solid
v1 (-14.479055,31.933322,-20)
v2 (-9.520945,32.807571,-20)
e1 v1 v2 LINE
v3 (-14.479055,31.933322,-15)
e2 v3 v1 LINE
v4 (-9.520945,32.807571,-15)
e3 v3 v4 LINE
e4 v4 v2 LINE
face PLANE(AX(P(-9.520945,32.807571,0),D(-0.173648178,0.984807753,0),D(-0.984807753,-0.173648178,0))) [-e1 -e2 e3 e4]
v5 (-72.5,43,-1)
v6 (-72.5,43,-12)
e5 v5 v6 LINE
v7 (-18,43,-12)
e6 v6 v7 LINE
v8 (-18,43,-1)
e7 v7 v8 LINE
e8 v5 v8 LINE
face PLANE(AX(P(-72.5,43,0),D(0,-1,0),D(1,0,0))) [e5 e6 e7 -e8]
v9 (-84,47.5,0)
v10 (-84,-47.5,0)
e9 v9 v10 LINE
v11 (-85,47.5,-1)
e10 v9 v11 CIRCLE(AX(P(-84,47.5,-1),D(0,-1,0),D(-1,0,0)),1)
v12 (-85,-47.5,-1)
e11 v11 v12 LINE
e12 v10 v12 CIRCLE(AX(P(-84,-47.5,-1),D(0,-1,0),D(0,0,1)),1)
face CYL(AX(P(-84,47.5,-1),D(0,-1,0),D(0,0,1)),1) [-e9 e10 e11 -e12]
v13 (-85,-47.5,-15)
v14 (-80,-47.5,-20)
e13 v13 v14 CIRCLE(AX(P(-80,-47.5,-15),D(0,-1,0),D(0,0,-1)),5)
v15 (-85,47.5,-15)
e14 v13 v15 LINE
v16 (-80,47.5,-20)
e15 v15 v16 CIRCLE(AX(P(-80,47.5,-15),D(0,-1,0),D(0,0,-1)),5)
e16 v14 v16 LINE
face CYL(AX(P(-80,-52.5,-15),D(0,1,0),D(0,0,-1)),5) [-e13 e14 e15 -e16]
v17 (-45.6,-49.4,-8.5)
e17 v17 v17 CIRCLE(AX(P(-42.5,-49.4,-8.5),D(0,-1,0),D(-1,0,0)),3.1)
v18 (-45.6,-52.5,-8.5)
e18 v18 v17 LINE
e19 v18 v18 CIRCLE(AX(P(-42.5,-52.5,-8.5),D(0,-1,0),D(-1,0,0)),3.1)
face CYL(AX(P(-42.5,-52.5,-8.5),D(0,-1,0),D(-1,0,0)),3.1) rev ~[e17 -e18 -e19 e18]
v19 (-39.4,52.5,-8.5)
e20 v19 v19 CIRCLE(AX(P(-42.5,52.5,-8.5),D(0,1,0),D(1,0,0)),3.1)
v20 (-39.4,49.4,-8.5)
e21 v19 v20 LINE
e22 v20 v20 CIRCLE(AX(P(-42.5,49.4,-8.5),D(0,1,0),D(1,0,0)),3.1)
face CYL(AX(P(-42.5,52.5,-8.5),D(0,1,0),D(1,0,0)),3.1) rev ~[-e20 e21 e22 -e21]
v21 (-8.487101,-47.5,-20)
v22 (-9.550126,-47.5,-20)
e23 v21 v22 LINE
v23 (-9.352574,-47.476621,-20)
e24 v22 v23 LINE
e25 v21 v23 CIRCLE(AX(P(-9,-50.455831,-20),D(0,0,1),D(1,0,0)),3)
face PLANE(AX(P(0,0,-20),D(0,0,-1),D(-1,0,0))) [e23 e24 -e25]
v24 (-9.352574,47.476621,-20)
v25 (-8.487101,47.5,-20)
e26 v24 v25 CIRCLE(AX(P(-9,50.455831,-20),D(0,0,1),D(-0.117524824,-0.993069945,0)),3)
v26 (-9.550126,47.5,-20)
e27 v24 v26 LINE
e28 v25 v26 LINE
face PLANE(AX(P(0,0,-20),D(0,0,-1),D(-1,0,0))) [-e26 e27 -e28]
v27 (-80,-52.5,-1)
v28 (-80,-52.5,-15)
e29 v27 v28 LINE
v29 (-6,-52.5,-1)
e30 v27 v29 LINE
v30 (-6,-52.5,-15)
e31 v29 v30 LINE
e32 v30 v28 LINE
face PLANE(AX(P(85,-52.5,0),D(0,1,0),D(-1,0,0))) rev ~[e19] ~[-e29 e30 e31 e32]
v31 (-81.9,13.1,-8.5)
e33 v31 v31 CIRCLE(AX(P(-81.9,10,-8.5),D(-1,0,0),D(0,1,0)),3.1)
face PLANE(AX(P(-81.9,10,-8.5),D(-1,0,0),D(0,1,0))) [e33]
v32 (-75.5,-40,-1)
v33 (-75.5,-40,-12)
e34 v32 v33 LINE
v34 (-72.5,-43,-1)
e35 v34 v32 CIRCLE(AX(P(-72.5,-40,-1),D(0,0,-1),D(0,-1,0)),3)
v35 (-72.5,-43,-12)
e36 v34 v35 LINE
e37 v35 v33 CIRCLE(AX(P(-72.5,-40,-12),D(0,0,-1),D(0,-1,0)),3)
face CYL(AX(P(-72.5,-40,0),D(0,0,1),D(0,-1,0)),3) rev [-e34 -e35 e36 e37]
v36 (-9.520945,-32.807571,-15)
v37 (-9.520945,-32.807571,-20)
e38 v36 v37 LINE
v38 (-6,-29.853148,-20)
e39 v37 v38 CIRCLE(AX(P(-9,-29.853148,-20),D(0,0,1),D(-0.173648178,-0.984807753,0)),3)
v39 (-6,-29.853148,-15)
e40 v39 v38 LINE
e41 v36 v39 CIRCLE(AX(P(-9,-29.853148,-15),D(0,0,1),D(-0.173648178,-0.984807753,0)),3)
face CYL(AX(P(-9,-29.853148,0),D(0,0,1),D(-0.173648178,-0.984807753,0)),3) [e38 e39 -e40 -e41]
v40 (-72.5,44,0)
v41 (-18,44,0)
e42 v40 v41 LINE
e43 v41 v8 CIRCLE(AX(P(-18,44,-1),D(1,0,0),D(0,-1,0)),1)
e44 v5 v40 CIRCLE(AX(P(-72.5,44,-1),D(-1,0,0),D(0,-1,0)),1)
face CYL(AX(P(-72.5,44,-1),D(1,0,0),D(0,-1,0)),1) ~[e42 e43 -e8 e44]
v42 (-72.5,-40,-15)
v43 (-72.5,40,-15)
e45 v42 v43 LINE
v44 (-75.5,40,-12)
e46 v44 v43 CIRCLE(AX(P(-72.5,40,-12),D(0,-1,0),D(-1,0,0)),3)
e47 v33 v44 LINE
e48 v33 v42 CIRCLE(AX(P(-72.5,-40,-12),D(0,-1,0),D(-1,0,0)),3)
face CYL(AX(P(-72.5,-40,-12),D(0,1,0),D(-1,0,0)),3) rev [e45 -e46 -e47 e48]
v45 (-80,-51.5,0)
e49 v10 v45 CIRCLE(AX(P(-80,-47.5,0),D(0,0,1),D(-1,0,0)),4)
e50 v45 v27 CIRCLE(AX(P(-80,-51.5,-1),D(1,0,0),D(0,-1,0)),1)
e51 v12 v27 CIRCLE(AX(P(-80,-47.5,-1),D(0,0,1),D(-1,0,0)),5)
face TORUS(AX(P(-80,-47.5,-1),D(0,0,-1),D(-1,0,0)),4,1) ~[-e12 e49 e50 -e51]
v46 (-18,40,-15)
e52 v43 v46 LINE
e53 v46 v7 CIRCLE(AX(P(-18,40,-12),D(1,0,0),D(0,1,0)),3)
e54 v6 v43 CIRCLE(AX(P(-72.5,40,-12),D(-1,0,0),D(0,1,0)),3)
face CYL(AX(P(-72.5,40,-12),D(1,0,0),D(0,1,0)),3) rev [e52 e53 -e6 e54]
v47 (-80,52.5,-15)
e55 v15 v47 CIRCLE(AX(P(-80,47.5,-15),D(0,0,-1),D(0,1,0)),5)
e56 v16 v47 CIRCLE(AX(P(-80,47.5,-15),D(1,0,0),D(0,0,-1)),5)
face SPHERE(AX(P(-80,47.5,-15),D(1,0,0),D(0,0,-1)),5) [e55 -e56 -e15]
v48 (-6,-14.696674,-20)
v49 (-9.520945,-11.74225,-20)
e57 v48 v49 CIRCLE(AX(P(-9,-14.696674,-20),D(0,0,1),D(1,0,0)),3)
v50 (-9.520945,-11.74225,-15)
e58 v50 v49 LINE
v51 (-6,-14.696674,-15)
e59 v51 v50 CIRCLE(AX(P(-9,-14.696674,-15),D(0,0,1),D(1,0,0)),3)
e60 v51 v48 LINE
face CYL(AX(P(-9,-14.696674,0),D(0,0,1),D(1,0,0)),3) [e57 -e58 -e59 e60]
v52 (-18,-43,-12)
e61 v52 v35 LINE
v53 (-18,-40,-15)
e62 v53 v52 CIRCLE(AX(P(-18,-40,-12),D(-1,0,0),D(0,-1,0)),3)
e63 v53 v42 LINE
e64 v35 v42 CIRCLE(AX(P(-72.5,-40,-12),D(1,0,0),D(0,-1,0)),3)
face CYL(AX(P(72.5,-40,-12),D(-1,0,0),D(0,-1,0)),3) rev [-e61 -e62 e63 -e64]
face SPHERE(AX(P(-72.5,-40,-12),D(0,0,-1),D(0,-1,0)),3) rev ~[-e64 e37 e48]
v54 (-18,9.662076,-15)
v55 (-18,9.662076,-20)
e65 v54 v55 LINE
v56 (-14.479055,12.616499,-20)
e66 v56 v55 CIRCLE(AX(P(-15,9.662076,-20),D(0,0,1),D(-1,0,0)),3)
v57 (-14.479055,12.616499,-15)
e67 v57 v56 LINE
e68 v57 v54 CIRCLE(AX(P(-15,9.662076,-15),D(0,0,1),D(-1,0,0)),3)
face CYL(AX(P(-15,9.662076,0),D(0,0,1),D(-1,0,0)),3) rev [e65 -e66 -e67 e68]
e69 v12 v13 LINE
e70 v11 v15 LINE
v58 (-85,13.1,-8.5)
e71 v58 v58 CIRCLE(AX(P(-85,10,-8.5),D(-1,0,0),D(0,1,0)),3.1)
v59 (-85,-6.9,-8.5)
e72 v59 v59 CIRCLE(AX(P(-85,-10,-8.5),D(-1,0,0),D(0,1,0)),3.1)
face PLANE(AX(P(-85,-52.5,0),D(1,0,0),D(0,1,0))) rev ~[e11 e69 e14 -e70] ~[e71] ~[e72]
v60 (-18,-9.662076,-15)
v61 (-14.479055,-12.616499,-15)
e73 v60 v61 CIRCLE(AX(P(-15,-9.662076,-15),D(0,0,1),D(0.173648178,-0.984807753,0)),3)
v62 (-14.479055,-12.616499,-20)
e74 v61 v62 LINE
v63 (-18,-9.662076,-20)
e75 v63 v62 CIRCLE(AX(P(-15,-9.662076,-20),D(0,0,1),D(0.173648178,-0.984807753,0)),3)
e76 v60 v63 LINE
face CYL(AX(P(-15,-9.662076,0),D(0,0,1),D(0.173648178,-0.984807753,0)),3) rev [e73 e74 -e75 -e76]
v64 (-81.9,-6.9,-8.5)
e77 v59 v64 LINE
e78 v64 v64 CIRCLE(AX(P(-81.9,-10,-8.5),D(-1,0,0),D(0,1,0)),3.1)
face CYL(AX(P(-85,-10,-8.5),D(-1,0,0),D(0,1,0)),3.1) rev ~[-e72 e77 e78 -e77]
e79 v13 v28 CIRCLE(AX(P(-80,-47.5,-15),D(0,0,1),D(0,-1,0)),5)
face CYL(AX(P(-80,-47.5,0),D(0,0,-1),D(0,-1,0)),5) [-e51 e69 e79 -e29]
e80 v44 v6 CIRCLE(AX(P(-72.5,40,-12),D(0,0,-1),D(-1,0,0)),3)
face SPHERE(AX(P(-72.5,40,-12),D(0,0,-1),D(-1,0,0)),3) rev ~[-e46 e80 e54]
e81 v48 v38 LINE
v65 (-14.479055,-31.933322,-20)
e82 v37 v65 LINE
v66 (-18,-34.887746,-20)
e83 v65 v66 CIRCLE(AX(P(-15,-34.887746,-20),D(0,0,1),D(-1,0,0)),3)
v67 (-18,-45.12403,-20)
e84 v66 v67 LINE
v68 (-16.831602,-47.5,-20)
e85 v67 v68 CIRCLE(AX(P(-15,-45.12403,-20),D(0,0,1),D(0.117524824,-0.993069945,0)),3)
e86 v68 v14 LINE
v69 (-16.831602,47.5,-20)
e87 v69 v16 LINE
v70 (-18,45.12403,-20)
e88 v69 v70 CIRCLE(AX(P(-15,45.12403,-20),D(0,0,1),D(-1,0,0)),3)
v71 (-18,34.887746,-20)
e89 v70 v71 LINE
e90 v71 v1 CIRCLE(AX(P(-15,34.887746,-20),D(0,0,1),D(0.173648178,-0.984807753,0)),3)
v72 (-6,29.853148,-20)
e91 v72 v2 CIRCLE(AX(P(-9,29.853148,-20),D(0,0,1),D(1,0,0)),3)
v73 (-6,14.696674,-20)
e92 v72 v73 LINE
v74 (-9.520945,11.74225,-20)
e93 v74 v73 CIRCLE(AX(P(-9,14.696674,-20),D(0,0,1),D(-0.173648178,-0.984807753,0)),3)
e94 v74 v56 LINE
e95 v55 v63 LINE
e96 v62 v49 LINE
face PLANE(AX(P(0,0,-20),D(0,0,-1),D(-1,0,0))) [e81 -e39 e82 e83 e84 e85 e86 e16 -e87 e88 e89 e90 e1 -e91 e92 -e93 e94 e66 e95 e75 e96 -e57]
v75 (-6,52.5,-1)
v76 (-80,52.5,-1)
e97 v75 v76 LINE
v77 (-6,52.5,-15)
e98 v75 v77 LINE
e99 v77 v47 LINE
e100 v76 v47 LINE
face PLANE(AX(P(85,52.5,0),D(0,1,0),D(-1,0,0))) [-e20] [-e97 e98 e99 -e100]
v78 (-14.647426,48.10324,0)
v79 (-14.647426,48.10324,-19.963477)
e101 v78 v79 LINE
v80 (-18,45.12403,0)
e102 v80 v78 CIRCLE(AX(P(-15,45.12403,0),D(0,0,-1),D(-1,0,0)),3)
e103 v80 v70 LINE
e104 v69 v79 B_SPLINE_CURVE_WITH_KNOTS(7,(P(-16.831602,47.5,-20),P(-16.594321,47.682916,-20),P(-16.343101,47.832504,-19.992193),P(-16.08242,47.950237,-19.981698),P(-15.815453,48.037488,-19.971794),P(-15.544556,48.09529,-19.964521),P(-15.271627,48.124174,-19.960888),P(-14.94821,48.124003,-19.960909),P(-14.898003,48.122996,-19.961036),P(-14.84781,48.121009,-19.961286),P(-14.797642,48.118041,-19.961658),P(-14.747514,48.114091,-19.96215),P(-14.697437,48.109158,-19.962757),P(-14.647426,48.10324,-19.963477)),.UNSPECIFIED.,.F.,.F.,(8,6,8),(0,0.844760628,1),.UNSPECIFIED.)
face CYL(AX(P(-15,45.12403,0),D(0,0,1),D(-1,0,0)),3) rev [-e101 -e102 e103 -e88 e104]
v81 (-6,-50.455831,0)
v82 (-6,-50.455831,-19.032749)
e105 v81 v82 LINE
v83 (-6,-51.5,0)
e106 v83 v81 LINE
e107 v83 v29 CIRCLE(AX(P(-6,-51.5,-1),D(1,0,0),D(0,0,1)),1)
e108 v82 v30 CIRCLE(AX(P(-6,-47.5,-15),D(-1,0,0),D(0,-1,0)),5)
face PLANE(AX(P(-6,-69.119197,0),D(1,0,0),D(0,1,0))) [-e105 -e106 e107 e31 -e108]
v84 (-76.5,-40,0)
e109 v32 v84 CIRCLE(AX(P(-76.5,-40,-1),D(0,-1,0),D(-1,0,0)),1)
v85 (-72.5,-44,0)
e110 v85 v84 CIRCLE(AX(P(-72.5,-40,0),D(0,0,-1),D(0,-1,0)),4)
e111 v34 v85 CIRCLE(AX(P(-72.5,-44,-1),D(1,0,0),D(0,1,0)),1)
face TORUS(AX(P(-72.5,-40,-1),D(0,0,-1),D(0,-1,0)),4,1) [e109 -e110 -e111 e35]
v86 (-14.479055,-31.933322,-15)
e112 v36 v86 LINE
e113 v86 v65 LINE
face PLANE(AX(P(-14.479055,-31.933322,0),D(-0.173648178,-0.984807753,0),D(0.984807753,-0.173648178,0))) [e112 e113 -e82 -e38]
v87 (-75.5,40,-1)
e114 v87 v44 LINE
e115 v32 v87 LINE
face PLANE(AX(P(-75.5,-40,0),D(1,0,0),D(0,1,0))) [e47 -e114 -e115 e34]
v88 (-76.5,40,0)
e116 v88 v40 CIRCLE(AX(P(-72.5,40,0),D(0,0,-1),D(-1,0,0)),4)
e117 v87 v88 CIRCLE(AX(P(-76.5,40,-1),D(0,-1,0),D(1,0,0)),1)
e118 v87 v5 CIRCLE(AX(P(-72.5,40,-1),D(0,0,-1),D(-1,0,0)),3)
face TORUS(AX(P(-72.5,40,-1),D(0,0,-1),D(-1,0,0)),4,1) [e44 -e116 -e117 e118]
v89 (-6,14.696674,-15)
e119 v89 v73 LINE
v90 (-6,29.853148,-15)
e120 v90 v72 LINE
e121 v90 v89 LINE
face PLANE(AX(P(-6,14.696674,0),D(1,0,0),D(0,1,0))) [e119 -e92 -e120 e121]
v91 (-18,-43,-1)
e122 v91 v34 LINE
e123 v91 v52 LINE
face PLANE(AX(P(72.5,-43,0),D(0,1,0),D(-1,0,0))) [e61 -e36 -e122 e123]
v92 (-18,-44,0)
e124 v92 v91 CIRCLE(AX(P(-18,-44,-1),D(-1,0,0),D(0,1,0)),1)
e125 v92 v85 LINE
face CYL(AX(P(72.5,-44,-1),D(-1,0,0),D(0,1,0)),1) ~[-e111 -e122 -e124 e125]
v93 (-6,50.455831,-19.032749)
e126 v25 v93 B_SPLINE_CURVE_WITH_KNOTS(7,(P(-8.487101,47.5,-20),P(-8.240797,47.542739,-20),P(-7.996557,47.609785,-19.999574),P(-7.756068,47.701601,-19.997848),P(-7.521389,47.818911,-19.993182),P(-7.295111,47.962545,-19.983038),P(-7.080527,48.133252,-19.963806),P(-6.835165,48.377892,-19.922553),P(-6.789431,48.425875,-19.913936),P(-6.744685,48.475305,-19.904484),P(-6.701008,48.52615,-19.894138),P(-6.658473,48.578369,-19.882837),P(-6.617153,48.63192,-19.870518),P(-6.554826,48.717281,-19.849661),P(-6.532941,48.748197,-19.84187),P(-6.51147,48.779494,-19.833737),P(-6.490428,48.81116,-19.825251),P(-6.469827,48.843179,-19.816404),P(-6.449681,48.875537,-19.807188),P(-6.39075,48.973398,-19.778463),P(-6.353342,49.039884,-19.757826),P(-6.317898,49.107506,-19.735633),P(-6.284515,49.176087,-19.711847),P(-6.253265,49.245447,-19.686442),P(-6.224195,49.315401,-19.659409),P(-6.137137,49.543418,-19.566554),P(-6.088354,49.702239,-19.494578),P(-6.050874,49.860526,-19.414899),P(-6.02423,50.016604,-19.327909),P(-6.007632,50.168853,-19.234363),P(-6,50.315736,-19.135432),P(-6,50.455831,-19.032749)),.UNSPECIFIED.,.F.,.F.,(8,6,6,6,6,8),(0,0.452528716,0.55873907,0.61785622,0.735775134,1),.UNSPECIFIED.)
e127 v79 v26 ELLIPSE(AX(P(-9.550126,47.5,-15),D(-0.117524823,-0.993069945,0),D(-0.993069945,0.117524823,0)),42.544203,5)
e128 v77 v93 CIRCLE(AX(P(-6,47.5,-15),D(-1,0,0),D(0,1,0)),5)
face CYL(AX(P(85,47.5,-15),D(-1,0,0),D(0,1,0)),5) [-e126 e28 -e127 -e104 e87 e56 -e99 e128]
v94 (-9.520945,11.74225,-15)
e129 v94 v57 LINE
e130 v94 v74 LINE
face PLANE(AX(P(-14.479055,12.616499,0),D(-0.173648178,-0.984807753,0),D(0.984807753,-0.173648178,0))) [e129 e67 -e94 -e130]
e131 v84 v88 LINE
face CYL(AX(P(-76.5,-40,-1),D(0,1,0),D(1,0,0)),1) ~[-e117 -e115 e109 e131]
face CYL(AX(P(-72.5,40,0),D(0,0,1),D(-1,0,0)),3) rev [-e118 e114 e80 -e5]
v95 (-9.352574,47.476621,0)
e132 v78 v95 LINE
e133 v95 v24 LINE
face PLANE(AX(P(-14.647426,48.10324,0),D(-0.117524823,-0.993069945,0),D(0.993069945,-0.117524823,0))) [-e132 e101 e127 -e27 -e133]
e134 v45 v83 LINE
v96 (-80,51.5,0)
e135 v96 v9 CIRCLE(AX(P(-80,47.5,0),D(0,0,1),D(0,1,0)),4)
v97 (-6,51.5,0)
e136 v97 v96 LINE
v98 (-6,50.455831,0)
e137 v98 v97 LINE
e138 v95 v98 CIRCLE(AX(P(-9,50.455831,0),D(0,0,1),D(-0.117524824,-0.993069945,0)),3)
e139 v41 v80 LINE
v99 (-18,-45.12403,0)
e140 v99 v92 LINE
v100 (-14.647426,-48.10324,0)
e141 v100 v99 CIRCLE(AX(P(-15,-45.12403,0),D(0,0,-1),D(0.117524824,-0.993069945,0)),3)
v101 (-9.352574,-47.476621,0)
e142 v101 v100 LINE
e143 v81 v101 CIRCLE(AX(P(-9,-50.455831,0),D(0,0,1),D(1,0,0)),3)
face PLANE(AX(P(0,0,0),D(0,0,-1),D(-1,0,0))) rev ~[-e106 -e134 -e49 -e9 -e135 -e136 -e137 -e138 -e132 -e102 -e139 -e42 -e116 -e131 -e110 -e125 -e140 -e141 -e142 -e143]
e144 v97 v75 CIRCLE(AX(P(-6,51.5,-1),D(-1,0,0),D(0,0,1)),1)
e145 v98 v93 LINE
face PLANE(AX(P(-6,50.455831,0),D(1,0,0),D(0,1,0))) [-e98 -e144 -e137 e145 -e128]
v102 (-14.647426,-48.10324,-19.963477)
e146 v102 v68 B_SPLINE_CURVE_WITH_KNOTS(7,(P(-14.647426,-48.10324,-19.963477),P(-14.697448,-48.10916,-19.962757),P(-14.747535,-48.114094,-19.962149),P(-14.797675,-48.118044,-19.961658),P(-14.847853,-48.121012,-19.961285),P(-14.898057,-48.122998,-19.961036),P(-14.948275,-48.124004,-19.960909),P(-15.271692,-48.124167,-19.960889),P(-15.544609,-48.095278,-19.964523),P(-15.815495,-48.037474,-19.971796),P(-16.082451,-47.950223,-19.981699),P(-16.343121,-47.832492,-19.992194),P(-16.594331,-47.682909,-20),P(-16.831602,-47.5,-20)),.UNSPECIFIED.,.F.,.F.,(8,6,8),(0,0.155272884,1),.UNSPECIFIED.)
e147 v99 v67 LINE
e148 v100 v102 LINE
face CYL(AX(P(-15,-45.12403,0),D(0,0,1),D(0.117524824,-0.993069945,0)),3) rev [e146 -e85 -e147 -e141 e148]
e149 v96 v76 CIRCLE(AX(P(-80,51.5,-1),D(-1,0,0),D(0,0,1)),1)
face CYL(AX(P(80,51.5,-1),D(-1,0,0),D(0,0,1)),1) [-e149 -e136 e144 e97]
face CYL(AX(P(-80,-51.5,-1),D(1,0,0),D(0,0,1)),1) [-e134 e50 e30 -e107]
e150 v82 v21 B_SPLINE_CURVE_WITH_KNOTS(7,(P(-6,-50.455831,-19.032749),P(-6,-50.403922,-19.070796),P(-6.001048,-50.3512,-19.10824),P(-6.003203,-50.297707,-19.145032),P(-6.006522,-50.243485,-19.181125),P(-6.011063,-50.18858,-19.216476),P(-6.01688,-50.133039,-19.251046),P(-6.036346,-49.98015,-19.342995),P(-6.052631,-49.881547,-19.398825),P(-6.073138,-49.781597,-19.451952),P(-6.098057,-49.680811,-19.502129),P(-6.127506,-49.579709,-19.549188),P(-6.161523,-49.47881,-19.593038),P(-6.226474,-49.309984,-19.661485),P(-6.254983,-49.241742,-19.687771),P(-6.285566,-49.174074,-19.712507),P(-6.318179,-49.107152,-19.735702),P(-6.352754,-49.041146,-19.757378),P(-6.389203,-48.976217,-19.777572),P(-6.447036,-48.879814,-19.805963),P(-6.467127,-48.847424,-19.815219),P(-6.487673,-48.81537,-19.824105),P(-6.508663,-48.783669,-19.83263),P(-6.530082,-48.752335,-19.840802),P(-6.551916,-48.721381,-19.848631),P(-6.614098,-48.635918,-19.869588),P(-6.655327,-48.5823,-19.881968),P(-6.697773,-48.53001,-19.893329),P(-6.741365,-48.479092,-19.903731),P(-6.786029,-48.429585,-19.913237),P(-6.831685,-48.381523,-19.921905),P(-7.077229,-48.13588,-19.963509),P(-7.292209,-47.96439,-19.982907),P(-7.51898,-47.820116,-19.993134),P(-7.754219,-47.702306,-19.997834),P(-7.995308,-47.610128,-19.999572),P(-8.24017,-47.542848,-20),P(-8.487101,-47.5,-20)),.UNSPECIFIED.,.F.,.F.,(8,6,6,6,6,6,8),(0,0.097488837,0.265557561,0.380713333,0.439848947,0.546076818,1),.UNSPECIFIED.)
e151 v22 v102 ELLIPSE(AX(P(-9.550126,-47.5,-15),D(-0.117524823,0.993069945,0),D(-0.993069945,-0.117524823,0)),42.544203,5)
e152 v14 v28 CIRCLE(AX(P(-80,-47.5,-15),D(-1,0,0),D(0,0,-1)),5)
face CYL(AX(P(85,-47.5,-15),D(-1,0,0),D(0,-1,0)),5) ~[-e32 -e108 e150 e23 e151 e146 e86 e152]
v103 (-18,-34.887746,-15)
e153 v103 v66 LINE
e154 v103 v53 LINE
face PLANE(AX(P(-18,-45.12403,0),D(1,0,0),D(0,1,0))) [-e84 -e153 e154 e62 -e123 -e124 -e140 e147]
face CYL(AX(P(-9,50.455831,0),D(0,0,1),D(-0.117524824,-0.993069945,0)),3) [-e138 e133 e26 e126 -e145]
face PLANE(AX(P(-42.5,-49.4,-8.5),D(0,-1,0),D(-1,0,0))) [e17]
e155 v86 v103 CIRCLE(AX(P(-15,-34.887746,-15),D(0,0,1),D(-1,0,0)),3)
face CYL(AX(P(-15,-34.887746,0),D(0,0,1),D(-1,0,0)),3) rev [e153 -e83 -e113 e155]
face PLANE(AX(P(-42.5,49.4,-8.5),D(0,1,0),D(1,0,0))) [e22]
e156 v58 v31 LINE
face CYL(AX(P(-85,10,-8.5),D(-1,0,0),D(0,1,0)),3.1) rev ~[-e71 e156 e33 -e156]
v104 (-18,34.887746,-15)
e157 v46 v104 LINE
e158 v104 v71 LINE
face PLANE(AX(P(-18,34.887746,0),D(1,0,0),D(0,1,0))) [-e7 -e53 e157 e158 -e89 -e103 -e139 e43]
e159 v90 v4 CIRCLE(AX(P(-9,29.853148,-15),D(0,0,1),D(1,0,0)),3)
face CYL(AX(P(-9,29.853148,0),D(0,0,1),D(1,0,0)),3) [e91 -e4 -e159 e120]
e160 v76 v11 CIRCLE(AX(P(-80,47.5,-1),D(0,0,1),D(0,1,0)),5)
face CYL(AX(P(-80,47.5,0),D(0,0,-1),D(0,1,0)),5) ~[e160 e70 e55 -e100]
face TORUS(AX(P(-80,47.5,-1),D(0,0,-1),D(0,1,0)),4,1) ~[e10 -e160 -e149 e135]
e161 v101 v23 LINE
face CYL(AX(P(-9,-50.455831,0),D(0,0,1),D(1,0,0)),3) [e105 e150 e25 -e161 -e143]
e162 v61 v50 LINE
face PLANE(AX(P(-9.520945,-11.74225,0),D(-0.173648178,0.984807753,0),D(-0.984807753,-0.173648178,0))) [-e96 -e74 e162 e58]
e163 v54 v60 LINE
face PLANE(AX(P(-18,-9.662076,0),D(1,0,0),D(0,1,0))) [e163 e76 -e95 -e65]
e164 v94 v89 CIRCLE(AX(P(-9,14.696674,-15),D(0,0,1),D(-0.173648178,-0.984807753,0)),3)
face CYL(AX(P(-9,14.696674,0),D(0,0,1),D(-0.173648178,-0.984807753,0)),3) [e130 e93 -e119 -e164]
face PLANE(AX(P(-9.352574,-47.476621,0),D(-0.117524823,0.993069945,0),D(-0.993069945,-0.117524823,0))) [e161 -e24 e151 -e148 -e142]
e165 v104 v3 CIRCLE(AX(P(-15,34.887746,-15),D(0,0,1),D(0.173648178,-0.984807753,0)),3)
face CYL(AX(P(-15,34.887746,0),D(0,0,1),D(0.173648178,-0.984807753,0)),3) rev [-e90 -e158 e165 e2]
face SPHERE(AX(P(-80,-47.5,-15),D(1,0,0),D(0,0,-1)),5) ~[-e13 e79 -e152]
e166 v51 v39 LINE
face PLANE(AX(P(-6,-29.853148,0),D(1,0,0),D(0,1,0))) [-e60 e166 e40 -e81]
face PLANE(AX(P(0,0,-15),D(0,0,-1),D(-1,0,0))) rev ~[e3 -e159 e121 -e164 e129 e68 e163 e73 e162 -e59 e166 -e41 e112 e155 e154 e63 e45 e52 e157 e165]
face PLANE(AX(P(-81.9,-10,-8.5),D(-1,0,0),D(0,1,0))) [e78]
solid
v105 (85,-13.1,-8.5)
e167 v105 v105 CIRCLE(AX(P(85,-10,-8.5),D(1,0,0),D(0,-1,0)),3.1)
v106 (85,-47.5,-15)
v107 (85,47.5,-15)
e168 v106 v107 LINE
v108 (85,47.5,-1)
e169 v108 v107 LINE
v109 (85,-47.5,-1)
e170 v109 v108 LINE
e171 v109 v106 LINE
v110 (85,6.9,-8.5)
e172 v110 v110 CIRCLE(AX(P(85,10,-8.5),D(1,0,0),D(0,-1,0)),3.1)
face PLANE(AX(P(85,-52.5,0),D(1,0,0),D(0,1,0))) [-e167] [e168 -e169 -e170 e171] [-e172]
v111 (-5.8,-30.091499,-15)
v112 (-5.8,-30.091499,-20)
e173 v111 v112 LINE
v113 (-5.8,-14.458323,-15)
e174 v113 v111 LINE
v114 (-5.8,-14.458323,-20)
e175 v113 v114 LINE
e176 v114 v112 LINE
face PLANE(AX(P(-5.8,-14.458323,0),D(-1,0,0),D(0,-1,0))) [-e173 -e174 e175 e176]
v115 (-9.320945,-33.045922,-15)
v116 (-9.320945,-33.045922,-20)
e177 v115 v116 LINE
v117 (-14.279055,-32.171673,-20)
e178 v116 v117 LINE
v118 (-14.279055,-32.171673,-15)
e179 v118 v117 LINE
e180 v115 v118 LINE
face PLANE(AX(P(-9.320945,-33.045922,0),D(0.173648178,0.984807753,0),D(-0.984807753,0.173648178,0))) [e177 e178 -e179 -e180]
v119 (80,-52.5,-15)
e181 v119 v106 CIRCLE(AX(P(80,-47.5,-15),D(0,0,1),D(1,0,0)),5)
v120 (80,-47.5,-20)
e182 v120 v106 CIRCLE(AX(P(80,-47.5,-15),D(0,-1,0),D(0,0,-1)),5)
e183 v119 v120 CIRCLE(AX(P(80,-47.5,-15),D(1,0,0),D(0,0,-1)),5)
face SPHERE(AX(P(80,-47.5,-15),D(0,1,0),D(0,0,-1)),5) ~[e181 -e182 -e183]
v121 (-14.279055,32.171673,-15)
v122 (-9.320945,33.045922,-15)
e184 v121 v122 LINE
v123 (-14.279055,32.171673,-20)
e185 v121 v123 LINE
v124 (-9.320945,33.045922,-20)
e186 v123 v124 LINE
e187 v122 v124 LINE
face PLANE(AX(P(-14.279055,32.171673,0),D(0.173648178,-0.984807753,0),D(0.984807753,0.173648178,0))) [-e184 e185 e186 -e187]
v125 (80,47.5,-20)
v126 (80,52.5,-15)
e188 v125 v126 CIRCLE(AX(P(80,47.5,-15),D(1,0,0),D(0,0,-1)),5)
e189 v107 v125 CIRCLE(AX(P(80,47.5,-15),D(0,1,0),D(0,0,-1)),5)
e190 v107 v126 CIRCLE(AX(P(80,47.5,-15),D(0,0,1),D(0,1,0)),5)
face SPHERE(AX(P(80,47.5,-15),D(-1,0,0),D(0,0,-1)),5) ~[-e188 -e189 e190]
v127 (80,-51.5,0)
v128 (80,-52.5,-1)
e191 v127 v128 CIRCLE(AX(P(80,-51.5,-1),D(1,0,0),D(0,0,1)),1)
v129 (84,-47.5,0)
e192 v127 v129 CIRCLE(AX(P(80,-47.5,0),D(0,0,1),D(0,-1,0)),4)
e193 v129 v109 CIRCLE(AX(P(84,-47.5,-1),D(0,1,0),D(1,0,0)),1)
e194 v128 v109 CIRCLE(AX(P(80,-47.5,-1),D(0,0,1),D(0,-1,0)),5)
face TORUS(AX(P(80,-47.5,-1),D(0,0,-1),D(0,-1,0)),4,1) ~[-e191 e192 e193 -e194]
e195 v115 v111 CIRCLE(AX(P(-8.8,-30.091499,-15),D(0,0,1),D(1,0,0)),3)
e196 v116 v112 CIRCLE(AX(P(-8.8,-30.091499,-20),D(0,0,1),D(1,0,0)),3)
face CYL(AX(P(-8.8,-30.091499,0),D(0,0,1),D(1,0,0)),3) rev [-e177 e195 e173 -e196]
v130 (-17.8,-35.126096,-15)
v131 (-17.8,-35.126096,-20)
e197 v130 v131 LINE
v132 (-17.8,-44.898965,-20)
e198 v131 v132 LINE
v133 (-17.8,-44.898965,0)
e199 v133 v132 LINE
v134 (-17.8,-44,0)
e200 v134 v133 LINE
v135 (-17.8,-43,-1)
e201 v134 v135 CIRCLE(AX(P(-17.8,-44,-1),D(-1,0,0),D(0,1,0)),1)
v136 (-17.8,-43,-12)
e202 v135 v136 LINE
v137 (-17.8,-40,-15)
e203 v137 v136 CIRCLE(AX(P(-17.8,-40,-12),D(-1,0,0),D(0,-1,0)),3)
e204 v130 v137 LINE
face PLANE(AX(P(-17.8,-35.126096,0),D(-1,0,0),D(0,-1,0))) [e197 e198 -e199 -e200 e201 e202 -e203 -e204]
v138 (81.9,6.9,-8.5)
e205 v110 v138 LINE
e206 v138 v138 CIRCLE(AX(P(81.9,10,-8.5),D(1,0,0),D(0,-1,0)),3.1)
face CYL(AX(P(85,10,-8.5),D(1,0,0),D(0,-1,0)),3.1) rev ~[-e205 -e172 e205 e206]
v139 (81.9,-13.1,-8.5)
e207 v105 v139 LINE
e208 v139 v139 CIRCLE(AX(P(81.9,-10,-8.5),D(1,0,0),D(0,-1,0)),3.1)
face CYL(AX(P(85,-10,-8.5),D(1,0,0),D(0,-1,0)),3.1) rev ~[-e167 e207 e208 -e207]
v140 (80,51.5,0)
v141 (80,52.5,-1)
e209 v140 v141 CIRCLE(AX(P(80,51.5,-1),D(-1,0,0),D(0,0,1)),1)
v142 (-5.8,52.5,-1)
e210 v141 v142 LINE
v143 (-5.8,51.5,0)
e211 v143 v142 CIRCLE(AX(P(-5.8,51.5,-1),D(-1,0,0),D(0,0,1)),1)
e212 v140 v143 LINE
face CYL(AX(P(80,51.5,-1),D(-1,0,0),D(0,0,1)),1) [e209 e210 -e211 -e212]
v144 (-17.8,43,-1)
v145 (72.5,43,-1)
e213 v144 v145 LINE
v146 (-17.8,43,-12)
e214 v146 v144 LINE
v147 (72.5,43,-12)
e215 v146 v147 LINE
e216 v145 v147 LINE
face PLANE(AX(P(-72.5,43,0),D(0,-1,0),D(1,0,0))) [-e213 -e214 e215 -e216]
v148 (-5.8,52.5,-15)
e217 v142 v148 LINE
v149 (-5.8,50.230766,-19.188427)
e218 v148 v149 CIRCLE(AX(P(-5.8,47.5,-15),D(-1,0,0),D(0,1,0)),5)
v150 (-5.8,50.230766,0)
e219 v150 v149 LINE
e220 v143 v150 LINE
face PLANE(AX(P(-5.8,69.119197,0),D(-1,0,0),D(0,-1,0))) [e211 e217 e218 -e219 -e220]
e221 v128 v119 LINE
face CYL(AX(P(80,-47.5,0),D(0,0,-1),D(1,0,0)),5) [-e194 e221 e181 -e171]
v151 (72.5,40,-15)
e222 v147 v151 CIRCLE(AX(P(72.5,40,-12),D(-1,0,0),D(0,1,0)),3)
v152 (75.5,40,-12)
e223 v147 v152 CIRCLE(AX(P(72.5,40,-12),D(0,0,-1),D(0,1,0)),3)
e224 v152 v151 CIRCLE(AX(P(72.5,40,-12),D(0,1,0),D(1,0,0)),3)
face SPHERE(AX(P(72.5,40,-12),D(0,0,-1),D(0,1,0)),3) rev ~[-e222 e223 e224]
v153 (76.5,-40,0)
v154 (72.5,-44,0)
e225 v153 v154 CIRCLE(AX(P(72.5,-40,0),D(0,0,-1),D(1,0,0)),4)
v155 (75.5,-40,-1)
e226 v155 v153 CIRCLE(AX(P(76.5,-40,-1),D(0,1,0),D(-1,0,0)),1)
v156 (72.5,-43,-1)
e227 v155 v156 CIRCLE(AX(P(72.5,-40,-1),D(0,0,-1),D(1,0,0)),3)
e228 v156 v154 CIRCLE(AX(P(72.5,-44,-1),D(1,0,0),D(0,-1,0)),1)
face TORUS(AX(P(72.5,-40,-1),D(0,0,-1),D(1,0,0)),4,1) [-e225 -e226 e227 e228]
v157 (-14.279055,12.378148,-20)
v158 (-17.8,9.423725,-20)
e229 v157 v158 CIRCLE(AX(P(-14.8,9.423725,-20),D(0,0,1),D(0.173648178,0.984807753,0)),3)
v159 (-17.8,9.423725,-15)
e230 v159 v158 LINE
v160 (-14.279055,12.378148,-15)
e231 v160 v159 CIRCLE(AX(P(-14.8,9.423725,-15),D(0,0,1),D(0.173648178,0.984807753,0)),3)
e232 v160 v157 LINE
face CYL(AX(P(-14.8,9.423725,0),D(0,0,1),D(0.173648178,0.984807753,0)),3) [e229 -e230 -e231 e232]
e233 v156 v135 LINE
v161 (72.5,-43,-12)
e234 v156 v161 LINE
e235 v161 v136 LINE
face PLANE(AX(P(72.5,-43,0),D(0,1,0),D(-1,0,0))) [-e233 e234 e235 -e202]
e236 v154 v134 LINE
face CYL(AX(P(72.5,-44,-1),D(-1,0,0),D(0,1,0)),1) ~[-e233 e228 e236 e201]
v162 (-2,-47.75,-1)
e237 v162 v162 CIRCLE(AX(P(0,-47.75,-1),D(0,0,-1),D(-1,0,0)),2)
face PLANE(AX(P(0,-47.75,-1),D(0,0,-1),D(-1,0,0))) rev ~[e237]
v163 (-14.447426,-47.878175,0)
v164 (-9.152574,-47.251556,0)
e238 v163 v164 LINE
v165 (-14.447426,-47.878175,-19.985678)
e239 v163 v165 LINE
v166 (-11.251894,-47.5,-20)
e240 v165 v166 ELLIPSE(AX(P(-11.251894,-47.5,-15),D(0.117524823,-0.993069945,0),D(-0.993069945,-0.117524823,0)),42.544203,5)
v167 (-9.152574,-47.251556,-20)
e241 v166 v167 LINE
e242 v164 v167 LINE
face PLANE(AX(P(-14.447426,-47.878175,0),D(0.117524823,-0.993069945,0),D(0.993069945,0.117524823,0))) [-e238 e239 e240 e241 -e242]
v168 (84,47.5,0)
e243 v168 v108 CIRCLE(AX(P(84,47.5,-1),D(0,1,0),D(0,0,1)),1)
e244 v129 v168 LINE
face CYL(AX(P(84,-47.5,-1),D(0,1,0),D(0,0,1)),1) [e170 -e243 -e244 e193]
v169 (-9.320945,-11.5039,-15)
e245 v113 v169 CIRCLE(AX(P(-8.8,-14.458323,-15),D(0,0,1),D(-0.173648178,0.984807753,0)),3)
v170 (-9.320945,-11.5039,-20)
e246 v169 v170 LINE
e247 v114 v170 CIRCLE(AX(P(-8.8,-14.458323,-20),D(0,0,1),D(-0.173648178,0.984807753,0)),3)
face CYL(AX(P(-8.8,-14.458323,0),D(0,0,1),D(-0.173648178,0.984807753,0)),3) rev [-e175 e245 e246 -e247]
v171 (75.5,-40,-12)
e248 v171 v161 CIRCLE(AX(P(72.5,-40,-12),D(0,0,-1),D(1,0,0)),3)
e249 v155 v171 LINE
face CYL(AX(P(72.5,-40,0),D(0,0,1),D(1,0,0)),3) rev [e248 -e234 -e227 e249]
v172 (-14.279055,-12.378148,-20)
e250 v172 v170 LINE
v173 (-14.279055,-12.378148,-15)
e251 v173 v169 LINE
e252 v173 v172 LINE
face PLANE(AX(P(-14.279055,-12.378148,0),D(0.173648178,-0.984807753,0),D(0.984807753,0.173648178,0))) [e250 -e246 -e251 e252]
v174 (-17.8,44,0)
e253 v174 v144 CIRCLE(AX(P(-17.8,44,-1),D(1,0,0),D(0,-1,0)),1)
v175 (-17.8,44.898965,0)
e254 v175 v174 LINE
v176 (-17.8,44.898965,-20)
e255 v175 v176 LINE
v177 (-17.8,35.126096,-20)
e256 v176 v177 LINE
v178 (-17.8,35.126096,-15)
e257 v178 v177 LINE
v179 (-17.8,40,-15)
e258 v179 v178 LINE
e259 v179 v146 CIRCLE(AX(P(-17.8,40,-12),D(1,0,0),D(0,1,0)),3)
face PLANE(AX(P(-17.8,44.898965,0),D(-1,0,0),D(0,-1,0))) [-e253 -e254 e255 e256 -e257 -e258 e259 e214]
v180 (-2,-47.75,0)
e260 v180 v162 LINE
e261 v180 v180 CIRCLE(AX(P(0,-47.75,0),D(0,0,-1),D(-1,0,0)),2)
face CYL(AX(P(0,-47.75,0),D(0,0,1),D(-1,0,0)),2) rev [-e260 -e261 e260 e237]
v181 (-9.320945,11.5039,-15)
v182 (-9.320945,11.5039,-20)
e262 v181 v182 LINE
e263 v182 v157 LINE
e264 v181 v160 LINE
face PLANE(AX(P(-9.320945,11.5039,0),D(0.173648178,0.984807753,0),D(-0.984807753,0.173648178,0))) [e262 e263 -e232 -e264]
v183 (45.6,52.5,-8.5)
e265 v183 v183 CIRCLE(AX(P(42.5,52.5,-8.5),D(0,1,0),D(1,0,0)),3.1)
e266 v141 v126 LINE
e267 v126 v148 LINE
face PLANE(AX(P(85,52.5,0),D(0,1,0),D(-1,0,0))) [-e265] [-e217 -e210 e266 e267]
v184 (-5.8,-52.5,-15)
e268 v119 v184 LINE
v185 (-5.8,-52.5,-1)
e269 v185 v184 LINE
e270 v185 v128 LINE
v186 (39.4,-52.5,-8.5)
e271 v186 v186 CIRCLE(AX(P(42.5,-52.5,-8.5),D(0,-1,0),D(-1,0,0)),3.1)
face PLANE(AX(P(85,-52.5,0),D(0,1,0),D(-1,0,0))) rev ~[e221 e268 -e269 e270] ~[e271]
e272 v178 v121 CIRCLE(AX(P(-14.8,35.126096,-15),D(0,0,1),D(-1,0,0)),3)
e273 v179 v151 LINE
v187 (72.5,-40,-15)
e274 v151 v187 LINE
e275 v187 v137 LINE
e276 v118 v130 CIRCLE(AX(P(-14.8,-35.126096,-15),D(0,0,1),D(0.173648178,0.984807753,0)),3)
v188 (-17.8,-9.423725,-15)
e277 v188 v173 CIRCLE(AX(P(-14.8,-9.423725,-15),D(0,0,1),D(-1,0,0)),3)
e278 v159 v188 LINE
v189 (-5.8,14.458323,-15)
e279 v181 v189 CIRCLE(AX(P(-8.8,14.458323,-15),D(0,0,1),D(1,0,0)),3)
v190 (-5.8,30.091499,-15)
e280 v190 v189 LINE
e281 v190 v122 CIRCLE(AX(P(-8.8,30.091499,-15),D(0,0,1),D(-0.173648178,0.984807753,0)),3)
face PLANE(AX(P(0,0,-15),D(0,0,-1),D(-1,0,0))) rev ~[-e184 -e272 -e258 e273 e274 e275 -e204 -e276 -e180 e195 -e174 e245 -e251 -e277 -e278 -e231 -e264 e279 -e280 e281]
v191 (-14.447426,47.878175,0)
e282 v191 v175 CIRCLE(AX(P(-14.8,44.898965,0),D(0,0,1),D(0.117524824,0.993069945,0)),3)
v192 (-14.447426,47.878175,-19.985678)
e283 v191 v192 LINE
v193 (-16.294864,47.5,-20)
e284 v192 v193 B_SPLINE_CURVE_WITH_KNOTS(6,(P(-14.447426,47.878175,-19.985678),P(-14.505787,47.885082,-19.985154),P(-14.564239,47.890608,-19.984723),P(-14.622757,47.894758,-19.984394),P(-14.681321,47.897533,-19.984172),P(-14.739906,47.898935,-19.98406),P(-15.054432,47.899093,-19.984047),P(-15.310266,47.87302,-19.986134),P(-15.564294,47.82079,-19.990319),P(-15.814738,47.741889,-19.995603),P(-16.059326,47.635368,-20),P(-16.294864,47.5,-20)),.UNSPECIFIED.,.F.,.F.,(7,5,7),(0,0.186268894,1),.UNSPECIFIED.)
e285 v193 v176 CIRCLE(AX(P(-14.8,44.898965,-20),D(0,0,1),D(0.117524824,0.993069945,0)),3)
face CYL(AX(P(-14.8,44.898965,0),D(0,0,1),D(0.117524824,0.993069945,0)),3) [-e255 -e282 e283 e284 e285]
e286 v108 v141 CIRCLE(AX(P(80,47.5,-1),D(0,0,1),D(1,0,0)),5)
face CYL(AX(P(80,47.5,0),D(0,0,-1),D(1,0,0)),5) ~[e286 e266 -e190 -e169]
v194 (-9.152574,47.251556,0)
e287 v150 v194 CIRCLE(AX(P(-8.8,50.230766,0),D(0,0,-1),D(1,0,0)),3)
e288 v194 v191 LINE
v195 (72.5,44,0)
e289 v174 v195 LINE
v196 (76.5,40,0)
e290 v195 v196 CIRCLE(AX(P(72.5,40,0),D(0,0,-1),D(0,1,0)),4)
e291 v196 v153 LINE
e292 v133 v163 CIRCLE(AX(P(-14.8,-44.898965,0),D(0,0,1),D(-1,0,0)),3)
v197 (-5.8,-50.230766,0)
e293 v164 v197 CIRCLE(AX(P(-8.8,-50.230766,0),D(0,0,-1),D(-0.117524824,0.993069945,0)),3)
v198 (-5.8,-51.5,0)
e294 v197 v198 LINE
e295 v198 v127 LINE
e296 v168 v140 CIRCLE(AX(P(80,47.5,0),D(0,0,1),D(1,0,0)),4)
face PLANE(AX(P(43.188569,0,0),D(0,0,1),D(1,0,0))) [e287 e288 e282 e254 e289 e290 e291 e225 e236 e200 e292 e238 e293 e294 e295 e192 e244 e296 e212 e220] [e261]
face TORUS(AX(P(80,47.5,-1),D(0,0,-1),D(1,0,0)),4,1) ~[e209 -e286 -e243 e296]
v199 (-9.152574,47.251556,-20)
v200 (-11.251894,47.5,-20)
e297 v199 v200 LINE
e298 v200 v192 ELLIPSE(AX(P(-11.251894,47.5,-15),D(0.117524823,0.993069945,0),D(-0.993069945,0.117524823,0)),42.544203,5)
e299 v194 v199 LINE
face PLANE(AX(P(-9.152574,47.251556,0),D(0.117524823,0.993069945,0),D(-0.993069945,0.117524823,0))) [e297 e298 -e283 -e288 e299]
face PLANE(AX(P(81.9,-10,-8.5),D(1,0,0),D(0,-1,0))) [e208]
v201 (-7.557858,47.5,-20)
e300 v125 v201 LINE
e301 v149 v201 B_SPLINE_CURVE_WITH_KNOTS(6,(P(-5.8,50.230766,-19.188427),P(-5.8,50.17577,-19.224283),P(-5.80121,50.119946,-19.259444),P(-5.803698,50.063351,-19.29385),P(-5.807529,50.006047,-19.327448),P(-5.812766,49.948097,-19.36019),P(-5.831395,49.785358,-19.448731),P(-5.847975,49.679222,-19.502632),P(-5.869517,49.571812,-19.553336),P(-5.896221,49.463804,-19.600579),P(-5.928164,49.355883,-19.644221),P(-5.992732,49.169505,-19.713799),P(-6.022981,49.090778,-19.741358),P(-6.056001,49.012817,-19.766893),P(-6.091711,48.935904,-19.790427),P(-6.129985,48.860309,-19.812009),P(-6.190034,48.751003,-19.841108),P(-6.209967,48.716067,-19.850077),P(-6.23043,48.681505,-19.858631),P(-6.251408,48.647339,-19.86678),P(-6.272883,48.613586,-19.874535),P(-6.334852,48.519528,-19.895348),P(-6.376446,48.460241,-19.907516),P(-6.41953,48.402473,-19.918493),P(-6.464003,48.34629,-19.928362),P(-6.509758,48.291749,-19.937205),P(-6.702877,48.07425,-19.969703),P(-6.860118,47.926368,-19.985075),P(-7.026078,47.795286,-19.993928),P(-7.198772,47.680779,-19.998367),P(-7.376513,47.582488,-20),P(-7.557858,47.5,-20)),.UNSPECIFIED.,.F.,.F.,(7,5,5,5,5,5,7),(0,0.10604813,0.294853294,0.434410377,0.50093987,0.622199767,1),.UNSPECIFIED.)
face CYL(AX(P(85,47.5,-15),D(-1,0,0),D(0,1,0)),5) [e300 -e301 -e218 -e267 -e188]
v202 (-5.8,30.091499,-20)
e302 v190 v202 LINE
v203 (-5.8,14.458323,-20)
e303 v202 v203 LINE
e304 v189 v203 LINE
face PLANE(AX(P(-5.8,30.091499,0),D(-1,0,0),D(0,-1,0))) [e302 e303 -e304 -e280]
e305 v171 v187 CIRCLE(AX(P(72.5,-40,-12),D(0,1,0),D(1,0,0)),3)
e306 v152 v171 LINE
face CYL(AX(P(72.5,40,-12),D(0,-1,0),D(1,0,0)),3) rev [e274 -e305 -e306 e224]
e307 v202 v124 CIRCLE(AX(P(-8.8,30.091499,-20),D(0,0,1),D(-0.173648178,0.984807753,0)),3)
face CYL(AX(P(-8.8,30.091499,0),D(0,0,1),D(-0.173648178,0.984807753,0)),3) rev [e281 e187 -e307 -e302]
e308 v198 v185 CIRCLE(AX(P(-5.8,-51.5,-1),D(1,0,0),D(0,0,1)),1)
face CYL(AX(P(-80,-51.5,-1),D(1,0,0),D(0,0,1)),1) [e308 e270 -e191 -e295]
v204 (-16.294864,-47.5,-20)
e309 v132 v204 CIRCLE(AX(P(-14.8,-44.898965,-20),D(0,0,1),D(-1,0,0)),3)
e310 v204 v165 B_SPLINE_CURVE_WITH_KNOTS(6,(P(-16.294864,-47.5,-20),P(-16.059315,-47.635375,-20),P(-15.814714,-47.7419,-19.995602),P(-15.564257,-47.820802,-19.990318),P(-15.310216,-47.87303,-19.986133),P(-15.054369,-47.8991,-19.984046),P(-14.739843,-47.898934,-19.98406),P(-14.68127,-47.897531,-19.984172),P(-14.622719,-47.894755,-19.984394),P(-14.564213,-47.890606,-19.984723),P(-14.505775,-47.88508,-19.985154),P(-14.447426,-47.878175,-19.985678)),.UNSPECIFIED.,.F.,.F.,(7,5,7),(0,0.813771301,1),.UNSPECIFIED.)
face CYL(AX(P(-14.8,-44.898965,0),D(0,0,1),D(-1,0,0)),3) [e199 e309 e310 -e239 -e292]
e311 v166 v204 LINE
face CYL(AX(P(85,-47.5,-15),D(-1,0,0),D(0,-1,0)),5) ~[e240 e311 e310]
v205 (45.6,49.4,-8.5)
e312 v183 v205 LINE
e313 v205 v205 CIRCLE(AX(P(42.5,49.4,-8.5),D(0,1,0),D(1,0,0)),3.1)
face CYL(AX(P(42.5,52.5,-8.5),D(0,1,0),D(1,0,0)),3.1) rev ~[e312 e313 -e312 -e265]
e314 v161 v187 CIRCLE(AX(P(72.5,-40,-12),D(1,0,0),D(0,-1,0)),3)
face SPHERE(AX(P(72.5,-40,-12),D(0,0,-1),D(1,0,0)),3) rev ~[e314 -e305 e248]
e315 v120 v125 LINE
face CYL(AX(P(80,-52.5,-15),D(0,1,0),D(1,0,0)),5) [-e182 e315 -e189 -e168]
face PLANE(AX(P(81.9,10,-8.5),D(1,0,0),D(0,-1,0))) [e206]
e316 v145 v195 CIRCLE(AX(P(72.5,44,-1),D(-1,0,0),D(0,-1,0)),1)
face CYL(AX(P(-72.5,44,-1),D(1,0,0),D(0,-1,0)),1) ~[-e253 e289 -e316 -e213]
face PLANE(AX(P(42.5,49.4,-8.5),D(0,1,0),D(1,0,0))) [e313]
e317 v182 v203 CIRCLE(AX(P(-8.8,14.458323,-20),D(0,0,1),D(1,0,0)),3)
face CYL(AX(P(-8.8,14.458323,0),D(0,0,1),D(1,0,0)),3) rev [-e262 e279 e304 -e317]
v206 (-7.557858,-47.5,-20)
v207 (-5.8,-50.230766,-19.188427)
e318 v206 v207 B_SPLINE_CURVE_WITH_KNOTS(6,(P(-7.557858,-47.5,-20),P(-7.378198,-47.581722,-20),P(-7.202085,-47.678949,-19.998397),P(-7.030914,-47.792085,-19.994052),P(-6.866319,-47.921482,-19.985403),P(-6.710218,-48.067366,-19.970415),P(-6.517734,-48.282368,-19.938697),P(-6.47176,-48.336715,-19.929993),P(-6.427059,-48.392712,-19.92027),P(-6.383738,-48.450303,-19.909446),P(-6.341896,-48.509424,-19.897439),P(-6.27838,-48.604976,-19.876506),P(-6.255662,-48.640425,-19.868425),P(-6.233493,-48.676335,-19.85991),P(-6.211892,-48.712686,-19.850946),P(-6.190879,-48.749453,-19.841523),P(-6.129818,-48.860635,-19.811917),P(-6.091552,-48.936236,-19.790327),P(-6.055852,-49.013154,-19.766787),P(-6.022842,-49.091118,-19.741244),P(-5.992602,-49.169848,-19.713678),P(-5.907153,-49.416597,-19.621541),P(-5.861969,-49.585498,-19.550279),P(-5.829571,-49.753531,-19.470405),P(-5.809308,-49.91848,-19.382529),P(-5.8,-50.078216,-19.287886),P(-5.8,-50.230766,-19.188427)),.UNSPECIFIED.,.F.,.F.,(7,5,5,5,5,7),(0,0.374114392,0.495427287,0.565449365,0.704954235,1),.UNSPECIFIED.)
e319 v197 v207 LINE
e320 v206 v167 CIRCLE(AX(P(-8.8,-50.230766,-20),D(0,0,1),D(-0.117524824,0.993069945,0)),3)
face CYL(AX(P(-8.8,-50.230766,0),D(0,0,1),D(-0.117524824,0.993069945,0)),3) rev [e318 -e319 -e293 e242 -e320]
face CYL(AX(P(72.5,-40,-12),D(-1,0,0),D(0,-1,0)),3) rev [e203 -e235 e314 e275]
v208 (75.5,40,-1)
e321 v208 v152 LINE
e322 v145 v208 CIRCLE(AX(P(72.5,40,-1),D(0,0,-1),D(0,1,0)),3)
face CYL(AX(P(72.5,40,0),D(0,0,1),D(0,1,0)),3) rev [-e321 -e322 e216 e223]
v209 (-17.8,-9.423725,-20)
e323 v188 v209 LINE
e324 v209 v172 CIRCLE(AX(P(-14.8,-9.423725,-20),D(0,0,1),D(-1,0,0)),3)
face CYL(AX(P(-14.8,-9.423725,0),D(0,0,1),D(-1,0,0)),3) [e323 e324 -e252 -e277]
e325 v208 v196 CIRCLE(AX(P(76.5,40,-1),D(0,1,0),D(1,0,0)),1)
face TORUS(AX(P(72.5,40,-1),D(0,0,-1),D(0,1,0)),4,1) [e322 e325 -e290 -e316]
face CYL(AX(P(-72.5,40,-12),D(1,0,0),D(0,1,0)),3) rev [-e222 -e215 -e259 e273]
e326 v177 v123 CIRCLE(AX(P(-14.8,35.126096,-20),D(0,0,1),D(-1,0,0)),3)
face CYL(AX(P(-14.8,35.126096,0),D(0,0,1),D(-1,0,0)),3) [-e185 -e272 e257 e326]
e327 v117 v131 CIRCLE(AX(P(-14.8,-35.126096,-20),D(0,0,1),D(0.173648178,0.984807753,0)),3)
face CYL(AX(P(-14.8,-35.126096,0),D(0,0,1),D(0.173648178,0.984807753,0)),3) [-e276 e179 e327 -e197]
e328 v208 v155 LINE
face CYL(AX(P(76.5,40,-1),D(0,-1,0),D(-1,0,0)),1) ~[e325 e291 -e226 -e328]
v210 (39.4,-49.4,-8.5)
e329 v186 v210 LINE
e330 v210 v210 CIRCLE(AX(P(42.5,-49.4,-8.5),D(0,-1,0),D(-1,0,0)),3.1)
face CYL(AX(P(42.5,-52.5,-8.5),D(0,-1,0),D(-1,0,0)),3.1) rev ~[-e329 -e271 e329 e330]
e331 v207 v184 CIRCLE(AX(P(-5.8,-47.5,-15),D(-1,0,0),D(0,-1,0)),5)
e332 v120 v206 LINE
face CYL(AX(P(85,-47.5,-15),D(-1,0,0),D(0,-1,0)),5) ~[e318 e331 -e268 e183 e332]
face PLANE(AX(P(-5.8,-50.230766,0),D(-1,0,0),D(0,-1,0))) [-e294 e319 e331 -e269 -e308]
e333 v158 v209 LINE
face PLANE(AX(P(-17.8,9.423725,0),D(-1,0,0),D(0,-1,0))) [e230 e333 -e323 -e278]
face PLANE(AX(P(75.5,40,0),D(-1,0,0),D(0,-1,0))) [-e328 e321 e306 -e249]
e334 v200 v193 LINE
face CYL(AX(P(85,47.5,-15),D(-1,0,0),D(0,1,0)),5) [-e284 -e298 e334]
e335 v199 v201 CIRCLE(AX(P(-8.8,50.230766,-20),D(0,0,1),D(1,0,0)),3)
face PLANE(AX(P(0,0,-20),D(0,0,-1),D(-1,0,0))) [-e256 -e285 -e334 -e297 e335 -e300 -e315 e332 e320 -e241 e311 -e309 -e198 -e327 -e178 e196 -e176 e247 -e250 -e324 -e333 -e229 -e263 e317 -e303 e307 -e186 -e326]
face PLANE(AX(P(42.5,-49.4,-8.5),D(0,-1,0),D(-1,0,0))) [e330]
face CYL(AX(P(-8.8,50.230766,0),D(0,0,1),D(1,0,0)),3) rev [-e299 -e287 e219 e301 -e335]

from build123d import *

# Parameters (mm, degrees)
F0_W      = 170
F0_H      = 105
F0_R      = 2
F3_DEPTH  = 20
F4_DEPTH  = 15
F5_R      = 5
F6_R      = 3
F7_R      = 1
F8_R      = 3.1
F9_DEPTH  = 3.1
F10_R     = 3.1
F11_DEPTH = 3.1
F12_R     = 3.1
F13_DEPTH = 3.1
F14_R     = 3.1
F15_DEPTH = 3.1
F16_DEPTH = 1
F17_ANGLE = 180
F19_DEPTH = 25
F20_DEPTH = 25


# Not quite as in the source:
# - a feature names something its author has since deleted; it is built from what else it names


with BuildPart() as f3:
    # F0 (on Top) → F3 (new body)
    with BuildSketch(Plane.XY):
        Rectangle(F0_W, F0_H)
        with Locations((0, -47.75)):
            Circle(F0_R, mode=Mode.SUBTRACT)
        with BuildLine():
            ThreePointArc((-75.5, 40), (-74.6213203436, 42.1213203436), (-72.5, 43))
            Line((-72.5, 43), (72.5, 43))
            ThreePointArc((72.5, 43), (74.6213203436, 42.1213203436), (75.5, 40))
            Line((75.5, 40), (75.5, -40))
            ThreePointArc((75.5, -40), (74.6213203436, -42.1213203436), (72.5, -43))
            Line((72.5, -43), (-72.5, -43))
            ThreePointArc((-72.5, -43), (-74.6213203436, -42.1213203436), (-75.5, -40))
            Line((-75.5, -40), (-75.5, 40))
        make_face(mode=Mode.SUBTRACT)
        with BuildLine():
            Line((72.5, 43), (-72.5, 43))
            ThreePointArc((-72.5, 43), (-74.6213203436, 42.1213203436), (-75.5, 40))
            Line((-75.5, 40), (-75.5, -40))
            ThreePointArc((-75.5, -40), (-74.6213203436, -42.1213203436), (-72.5, -43))
            Line((-72.5, -43), (72.5, -43))
            ThreePointArc((72.5, -43), (74.6213203436, -42.1213203436), (75.5, -40))
            Line((75.5, -40), (75.5, 40))
            ThreePointArc((75.5, 40), (74.6213203436, 42.1213203436), (72.5, 43))
        make_face()
        with Locations((0, -47.75)):
            Circle(F0_R)
    extrude(amount=F3_DEPTH)

    # F0 (on Top) → F4 (cut)
    with BuildSketch(Plane.XY):
        with BuildLine():
            Line((72.5, 43), (-72.5, 43))
            ThreePointArc((-72.5, 43), (-74.6213203436, 42.1213203436), (-75.5, 40))
            Line((-75.5, 40), (-75.5, -40))
            ThreePointArc((-75.5, -40), (-74.6213203436, -42.1213203436), (-72.5, -43))
            Line((-72.5, -43), (72.5, -43))
            ThreePointArc((72.5, -43), (74.6213203436, -42.1213203436), (75.5, -40))
            Line((75.5, -40), (75.5, 40))
            ThreePointArc((75.5, 40), (74.6213203436, 42.1213203436), (72.5, 43))
        make_face()
    extrude(amount=F4_DEPTH, mode=Mode.SUBTRACT)

    # F5
    f5_edges = [f3.edges().sort_by_distance(p)[0] for p in [
        (0, 52.5, 20),
        (-85, 0, 20),
        (0, -52.5, 20),
        (85, 0, 20),
        (85, 52.5, 10),
        (-85, 52.5, 10),
        (-85, -52.5, 10),
        (85, -52.5, 10),
    ]]
    fillet(f5_edges, radius=F5_R)

    # F6
    f6_edges = [f3.edges().sort_by_distance(p)[0] for p in [
        (0, 43, 15),
        (-74.62132, 42.12132, 15),
        (-75.5, 0, 15),
        (-74.62132, -42.12132, 15),
        (0, -43, 15),
        (74.62132, -42.12132, 15),
        (75.5, 0, 15),
        (74.62132, 42.12132, 15),
    ]]
    fillet(f6_edges, radius=F6_R)

    # F7
    f7_edges = [f3.edges().sort_by_distance(p)[0] for p in [
        (0, 52.5, 0),
        (83.535534, 51.035534, 0),
        (-83.535534, 51.035534, 0),
        (85, 0, 0),
        (-85, 0, 0),
        (83.535534, -51.035534, 0),
        (-83.535534, -51.035534, 0),
        (0, -52.5, 0),
        (0, 43, 0),
        (-74.62132, 42.12132, 0),
        (-75.5, 0, 0),
        (-74.62132, -42.12132, 0),
        (0, -43, 0),
        (74.62132, -42.12132, 0),
        (75.5, 0, 0),
        (74.62132, 42.12132, 0),
    ]]
    fillet(f7_edges, radius=F7_R)

    # F8 (on face) → F9 (cut)
    with BuildSketch(Plane.XZ.offset(52.5)):
        with Locations((42.5, 8.5)):
            Circle(F8_R)
        with Locations((-42.5, 8.5)):
            Circle(F8_R)
    extrude(amount=-F9_DEPTH, mode=Mode.SUBTRACT)

    # F10 (on face) → F11 (cut)
    with BuildSketch(Plane(origin=(0, 52.5, 0), x_dir=(-1, 0, 0), z_dir=(0, 1, 0))):
        with Locations((42.5, 8.5)):
            Circle(F10_R)
        with Locations((-42.5, 8.5)):
            Circle(F10_R)
    extrude(amount=-F11_DEPTH, mode=Mode.SUBTRACT)

    # F12 (on face) → F13 (cut)
    with BuildSketch(Plane(origin=(-85, 0, 0), x_dir=(0, -1, 0), z_dir=(-1, 0, 0))):
        with Locations((10, 8.5)):
            Circle(F12_R)
        with Locations((-10, 8.5)):
            Circle(F12_R)
    extrude(amount=-F13_DEPTH, mode=Mode.SUBTRACT)

    # F14 (on face) → F15 (cut)
    with BuildSketch(Plane.YZ.offset(85)):
        with Locations((10, 8.5)):
            Circle(F14_R)
        with Locations((-10, 8.5)):
            Circle(F14_R)
    extrude(amount=-F15_DEPTH, mode=Mode.SUBTRACT)

    # F0 (on Top) → F16 (cut)
    with BuildSketch(Plane.XY):
        with Locations((0, -47.75)):
            Circle(F0_R)
    extrude(amount=F16_DEPTH, mode=Mode.SUBTRACT)


with BuildPart() as f3_1:
    # F17: moved
    add(f3.part.rotate(Axis((0, 0, 0), (0, 1, 0)), F17_ANGLE))


with BuildPart() as f19:
    # F18 (on Top) → F19 (new body)
    with BuildSketch(Plane.XY):
        with BuildLine():
            Line((-18, -9.6620759565), (-18, 0))
            Line((-18, 0), (-18, 9.6620759565))
            ThreePointArc((-18, 9.6620759565), (-16.9283628291, 11.9602092859), (-14.479055467, 12.6164992155))
            Line((-14.479055467, 12.6164992155), (-9.520944533, 11.7422504845))
            ThreePointArc((-9.520944533, 11.7422504845), (-7.0716371709, 12.3985404142), (-6, 14.6966737436))
            Line((-6, 14.6966737436), (-6, 29.8531478456))
            ThreePointArc((-6, 29.8531478456), (-7.0716371709, 32.151281175), (-9.520944533, 32.8075711047))
            Line((-9.520944533, 32.8075711047), (-14.479055467, 31.9333223736))
            ThreePointArc((-14.479055467, 31.9333223736), (-16.9283628291, 32.5896123033), (-18, 34.8877456327))
            Line((-18, 34.8877456327), (-18, 45.1240298712))
            ThreePointArc((-18, 45.1240298712), (-16.9927715108, 47.3665422359), (-14.6474255295, 48.1032397065))
            Line((-14.6474255295, 48.1032397065), (-9.3525744705, 47.4766207667))
            ThreePointArc((-9.3525744705, 47.4766207667), (-7.0072284892, 48.2133182373), (-6, 50.455830602))
            Line((-6, 50.455830602), (-6, 69.1191965569))
            Line((-6, 69.1191965569), (-107.2437387941, 69.1191965569))
            Line((-107.2437387941, 69.1191965569), (-107.2437387941, 0))
            Line((-107.2437387941, 0), (-107.2437387941, -69.1191965569))
            Line((-107.2437387941, -69.1191965569), (-6, -69.1191965569))
            Line((-6, -69.1191965569), (-6, -50.455830602))
            ThreePointArc((-6, -50.455830602), (-7.0072284892, -48.2133182373), (-9.3525744705, -47.4766207667))
            Line((-9.3525744705, -47.4766207667), (-14.6474255295, -48.1032397065))
            ThreePointArc((-14.6474255295, -48.1032397065), (-16.9927715108, -47.3665422359), (-18, -45.1240298712))
            Line((-18, -45.1240298712), (-18, -34.8877456327))
            ThreePointArc((-18, -34.8877456327), (-16.9283628291, -32.5896123033), (-14.479055467, -31.9333223736))
            Line((-14.479055467, -31.9333223736), (-9.520944533, -32.8075711047))
            ThreePointArc((-9.520944533, -32.8075711047), (-7.0716371709, -32.151281175), (-6, -29.8531478456))
            Line((-6, -29.8531478456), (-6, -14.6966737436))
            ThreePointArc((-6, -14.6966737436), (-7.0716371709, -12.3985404142), (-9.520944533, -11.7422504845))
            Line((-9.520944533, -11.7422504845), (-14.479055467, -12.6164992155))
            ThreePointArc((-14.479055467, -12.6164992155), (-16.9283628291, -11.9602092859), (-18, -9.6620759565))
        make_face()
    extrude(amount=-F19_DEPTH)


with BuildPart() as f20:
    # F18 (on Top) → F20 (new body)
    with BuildSketch(Plane.XY):
        with BuildLine():
            Line((108.1050901483, 69.1191965569), (-5.8, 69.1191965569))
            Line((-5.8, 69.1191965569), (-5.8, 50.2307659268))
            ThreePointArc((-5.8, 50.2307659268), (-6.8072284892, 47.9882535621), (-9.1525744705, 47.2515560915))
            Line((-9.1525744705, 47.2515560915), (-14.4474255295, 47.8781750312))
            ThreePointArc((-14.4474255295, 47.8781750312), (-16.7927715108, 47.1414775606), (-17.8, 44.8989651959))
            Line((-17.8, 44.8989651959), (-17.8, 35.1260963512))
            ThreePointArc((-17.8, 35.1260963512), (-16.7283628291, 32.8279630218), (-14.279055467, 32.1716730922))
            Line((-14.279055467, 32.1716730922), (-9.320944533, 33.0459218232))
            ThreePointArc((-9.320944533, 33.0459218232), (-6.8716371709, 32.3896318935), (-5.8, 30.0914985641))
            Line((-5.8, 30.0914985641), (-5.8, 14.4583230251))
            ThreePointArc((-5.8, 14.4583230251), (-6.8716371709, 12.1601896957), (-9.320944533, 11.503899766))
            Line((-9.320944533, 11.503899766), (-14.279055467, 12.378148497))
            ThreePointArc((-14.279055467, 12.378148497), (-16.7283628291, 11.7218585673), (-17.8, 9.423725238))
            Line((-17.8, 9.423725238), (-17.8, 0))
            Line((-17.8, 0), (-17.8, -9.423725238))
            ThreePointArc((-17.8, -9.423725238), (-16.7283628291, -11.7218585673), (-14.279055467, -12.378148497))
            Line((-14.279055467, -12.378148497), (-9.320944533, -11.503899766))
            ThreePointArc((-9.320944533, -11.503899766), (-6.8716371709, -12.1601896957), (-5.8, -14.4583230251))
            Line((-5.8, -14.4583230251), (-5.8, -30.0914985641))
            ThreePointArc((-5.8, -30.0914985641), (-6.8716371709, -32.3896318935), (-9.320944533, -33.0459218232))
            Line((-9.320944533, -33.0459218232), (-14.279055467, -32.1716730922))
            ThreePointArc((-14.279055467, -32.1716730922), (-16.7283628291, -32.8279630218), (-17.8, -35.1260963512))
            Line((-17.8, -35.1260963512), (-17.8, -44.8989651959))
            ThreePointArc((-17.8, -44.8989651959), (-16.7927715108, -47.1414775606), (-14.4474255295, -47.8781750312))
            Line((-14.4474255295, -47.8781750312), (-9.1525744705, -47.2515560915))
            ThreePointArc((-9.1525744705, -47.2515560915), (-6.8072284892, -47.9882535621), (-5.8, -50.2307659268))
            Line((-5.8, -50.2307659268), (-5.8, -69.1191965569))
            Line((-5.8, -69.1191965569), (108.1050901483, -69.1191965569))
            Line((108.1050901483, -69.1191965569), (108.1050901483, 69.1191965569))
        make_face()
    extrude(amount=-F20_DEPTH)


with BuildPart() as f21_1:
    # F21: copy of F3
    add(f3_1.part)


with BuildPart() as f3_2:
    add(f3_1.part)

    # F22: intersect F19
    add(f19.part, mode=Mode.INTERSECT)


with BuildPart() as f20_1:
    add(f20.part)

    # F23: intersect F21_1
    add(f21_1.part, mode=Mode.INTERSECT)


solid = Compound([f3_2.part, f20_1.part])
